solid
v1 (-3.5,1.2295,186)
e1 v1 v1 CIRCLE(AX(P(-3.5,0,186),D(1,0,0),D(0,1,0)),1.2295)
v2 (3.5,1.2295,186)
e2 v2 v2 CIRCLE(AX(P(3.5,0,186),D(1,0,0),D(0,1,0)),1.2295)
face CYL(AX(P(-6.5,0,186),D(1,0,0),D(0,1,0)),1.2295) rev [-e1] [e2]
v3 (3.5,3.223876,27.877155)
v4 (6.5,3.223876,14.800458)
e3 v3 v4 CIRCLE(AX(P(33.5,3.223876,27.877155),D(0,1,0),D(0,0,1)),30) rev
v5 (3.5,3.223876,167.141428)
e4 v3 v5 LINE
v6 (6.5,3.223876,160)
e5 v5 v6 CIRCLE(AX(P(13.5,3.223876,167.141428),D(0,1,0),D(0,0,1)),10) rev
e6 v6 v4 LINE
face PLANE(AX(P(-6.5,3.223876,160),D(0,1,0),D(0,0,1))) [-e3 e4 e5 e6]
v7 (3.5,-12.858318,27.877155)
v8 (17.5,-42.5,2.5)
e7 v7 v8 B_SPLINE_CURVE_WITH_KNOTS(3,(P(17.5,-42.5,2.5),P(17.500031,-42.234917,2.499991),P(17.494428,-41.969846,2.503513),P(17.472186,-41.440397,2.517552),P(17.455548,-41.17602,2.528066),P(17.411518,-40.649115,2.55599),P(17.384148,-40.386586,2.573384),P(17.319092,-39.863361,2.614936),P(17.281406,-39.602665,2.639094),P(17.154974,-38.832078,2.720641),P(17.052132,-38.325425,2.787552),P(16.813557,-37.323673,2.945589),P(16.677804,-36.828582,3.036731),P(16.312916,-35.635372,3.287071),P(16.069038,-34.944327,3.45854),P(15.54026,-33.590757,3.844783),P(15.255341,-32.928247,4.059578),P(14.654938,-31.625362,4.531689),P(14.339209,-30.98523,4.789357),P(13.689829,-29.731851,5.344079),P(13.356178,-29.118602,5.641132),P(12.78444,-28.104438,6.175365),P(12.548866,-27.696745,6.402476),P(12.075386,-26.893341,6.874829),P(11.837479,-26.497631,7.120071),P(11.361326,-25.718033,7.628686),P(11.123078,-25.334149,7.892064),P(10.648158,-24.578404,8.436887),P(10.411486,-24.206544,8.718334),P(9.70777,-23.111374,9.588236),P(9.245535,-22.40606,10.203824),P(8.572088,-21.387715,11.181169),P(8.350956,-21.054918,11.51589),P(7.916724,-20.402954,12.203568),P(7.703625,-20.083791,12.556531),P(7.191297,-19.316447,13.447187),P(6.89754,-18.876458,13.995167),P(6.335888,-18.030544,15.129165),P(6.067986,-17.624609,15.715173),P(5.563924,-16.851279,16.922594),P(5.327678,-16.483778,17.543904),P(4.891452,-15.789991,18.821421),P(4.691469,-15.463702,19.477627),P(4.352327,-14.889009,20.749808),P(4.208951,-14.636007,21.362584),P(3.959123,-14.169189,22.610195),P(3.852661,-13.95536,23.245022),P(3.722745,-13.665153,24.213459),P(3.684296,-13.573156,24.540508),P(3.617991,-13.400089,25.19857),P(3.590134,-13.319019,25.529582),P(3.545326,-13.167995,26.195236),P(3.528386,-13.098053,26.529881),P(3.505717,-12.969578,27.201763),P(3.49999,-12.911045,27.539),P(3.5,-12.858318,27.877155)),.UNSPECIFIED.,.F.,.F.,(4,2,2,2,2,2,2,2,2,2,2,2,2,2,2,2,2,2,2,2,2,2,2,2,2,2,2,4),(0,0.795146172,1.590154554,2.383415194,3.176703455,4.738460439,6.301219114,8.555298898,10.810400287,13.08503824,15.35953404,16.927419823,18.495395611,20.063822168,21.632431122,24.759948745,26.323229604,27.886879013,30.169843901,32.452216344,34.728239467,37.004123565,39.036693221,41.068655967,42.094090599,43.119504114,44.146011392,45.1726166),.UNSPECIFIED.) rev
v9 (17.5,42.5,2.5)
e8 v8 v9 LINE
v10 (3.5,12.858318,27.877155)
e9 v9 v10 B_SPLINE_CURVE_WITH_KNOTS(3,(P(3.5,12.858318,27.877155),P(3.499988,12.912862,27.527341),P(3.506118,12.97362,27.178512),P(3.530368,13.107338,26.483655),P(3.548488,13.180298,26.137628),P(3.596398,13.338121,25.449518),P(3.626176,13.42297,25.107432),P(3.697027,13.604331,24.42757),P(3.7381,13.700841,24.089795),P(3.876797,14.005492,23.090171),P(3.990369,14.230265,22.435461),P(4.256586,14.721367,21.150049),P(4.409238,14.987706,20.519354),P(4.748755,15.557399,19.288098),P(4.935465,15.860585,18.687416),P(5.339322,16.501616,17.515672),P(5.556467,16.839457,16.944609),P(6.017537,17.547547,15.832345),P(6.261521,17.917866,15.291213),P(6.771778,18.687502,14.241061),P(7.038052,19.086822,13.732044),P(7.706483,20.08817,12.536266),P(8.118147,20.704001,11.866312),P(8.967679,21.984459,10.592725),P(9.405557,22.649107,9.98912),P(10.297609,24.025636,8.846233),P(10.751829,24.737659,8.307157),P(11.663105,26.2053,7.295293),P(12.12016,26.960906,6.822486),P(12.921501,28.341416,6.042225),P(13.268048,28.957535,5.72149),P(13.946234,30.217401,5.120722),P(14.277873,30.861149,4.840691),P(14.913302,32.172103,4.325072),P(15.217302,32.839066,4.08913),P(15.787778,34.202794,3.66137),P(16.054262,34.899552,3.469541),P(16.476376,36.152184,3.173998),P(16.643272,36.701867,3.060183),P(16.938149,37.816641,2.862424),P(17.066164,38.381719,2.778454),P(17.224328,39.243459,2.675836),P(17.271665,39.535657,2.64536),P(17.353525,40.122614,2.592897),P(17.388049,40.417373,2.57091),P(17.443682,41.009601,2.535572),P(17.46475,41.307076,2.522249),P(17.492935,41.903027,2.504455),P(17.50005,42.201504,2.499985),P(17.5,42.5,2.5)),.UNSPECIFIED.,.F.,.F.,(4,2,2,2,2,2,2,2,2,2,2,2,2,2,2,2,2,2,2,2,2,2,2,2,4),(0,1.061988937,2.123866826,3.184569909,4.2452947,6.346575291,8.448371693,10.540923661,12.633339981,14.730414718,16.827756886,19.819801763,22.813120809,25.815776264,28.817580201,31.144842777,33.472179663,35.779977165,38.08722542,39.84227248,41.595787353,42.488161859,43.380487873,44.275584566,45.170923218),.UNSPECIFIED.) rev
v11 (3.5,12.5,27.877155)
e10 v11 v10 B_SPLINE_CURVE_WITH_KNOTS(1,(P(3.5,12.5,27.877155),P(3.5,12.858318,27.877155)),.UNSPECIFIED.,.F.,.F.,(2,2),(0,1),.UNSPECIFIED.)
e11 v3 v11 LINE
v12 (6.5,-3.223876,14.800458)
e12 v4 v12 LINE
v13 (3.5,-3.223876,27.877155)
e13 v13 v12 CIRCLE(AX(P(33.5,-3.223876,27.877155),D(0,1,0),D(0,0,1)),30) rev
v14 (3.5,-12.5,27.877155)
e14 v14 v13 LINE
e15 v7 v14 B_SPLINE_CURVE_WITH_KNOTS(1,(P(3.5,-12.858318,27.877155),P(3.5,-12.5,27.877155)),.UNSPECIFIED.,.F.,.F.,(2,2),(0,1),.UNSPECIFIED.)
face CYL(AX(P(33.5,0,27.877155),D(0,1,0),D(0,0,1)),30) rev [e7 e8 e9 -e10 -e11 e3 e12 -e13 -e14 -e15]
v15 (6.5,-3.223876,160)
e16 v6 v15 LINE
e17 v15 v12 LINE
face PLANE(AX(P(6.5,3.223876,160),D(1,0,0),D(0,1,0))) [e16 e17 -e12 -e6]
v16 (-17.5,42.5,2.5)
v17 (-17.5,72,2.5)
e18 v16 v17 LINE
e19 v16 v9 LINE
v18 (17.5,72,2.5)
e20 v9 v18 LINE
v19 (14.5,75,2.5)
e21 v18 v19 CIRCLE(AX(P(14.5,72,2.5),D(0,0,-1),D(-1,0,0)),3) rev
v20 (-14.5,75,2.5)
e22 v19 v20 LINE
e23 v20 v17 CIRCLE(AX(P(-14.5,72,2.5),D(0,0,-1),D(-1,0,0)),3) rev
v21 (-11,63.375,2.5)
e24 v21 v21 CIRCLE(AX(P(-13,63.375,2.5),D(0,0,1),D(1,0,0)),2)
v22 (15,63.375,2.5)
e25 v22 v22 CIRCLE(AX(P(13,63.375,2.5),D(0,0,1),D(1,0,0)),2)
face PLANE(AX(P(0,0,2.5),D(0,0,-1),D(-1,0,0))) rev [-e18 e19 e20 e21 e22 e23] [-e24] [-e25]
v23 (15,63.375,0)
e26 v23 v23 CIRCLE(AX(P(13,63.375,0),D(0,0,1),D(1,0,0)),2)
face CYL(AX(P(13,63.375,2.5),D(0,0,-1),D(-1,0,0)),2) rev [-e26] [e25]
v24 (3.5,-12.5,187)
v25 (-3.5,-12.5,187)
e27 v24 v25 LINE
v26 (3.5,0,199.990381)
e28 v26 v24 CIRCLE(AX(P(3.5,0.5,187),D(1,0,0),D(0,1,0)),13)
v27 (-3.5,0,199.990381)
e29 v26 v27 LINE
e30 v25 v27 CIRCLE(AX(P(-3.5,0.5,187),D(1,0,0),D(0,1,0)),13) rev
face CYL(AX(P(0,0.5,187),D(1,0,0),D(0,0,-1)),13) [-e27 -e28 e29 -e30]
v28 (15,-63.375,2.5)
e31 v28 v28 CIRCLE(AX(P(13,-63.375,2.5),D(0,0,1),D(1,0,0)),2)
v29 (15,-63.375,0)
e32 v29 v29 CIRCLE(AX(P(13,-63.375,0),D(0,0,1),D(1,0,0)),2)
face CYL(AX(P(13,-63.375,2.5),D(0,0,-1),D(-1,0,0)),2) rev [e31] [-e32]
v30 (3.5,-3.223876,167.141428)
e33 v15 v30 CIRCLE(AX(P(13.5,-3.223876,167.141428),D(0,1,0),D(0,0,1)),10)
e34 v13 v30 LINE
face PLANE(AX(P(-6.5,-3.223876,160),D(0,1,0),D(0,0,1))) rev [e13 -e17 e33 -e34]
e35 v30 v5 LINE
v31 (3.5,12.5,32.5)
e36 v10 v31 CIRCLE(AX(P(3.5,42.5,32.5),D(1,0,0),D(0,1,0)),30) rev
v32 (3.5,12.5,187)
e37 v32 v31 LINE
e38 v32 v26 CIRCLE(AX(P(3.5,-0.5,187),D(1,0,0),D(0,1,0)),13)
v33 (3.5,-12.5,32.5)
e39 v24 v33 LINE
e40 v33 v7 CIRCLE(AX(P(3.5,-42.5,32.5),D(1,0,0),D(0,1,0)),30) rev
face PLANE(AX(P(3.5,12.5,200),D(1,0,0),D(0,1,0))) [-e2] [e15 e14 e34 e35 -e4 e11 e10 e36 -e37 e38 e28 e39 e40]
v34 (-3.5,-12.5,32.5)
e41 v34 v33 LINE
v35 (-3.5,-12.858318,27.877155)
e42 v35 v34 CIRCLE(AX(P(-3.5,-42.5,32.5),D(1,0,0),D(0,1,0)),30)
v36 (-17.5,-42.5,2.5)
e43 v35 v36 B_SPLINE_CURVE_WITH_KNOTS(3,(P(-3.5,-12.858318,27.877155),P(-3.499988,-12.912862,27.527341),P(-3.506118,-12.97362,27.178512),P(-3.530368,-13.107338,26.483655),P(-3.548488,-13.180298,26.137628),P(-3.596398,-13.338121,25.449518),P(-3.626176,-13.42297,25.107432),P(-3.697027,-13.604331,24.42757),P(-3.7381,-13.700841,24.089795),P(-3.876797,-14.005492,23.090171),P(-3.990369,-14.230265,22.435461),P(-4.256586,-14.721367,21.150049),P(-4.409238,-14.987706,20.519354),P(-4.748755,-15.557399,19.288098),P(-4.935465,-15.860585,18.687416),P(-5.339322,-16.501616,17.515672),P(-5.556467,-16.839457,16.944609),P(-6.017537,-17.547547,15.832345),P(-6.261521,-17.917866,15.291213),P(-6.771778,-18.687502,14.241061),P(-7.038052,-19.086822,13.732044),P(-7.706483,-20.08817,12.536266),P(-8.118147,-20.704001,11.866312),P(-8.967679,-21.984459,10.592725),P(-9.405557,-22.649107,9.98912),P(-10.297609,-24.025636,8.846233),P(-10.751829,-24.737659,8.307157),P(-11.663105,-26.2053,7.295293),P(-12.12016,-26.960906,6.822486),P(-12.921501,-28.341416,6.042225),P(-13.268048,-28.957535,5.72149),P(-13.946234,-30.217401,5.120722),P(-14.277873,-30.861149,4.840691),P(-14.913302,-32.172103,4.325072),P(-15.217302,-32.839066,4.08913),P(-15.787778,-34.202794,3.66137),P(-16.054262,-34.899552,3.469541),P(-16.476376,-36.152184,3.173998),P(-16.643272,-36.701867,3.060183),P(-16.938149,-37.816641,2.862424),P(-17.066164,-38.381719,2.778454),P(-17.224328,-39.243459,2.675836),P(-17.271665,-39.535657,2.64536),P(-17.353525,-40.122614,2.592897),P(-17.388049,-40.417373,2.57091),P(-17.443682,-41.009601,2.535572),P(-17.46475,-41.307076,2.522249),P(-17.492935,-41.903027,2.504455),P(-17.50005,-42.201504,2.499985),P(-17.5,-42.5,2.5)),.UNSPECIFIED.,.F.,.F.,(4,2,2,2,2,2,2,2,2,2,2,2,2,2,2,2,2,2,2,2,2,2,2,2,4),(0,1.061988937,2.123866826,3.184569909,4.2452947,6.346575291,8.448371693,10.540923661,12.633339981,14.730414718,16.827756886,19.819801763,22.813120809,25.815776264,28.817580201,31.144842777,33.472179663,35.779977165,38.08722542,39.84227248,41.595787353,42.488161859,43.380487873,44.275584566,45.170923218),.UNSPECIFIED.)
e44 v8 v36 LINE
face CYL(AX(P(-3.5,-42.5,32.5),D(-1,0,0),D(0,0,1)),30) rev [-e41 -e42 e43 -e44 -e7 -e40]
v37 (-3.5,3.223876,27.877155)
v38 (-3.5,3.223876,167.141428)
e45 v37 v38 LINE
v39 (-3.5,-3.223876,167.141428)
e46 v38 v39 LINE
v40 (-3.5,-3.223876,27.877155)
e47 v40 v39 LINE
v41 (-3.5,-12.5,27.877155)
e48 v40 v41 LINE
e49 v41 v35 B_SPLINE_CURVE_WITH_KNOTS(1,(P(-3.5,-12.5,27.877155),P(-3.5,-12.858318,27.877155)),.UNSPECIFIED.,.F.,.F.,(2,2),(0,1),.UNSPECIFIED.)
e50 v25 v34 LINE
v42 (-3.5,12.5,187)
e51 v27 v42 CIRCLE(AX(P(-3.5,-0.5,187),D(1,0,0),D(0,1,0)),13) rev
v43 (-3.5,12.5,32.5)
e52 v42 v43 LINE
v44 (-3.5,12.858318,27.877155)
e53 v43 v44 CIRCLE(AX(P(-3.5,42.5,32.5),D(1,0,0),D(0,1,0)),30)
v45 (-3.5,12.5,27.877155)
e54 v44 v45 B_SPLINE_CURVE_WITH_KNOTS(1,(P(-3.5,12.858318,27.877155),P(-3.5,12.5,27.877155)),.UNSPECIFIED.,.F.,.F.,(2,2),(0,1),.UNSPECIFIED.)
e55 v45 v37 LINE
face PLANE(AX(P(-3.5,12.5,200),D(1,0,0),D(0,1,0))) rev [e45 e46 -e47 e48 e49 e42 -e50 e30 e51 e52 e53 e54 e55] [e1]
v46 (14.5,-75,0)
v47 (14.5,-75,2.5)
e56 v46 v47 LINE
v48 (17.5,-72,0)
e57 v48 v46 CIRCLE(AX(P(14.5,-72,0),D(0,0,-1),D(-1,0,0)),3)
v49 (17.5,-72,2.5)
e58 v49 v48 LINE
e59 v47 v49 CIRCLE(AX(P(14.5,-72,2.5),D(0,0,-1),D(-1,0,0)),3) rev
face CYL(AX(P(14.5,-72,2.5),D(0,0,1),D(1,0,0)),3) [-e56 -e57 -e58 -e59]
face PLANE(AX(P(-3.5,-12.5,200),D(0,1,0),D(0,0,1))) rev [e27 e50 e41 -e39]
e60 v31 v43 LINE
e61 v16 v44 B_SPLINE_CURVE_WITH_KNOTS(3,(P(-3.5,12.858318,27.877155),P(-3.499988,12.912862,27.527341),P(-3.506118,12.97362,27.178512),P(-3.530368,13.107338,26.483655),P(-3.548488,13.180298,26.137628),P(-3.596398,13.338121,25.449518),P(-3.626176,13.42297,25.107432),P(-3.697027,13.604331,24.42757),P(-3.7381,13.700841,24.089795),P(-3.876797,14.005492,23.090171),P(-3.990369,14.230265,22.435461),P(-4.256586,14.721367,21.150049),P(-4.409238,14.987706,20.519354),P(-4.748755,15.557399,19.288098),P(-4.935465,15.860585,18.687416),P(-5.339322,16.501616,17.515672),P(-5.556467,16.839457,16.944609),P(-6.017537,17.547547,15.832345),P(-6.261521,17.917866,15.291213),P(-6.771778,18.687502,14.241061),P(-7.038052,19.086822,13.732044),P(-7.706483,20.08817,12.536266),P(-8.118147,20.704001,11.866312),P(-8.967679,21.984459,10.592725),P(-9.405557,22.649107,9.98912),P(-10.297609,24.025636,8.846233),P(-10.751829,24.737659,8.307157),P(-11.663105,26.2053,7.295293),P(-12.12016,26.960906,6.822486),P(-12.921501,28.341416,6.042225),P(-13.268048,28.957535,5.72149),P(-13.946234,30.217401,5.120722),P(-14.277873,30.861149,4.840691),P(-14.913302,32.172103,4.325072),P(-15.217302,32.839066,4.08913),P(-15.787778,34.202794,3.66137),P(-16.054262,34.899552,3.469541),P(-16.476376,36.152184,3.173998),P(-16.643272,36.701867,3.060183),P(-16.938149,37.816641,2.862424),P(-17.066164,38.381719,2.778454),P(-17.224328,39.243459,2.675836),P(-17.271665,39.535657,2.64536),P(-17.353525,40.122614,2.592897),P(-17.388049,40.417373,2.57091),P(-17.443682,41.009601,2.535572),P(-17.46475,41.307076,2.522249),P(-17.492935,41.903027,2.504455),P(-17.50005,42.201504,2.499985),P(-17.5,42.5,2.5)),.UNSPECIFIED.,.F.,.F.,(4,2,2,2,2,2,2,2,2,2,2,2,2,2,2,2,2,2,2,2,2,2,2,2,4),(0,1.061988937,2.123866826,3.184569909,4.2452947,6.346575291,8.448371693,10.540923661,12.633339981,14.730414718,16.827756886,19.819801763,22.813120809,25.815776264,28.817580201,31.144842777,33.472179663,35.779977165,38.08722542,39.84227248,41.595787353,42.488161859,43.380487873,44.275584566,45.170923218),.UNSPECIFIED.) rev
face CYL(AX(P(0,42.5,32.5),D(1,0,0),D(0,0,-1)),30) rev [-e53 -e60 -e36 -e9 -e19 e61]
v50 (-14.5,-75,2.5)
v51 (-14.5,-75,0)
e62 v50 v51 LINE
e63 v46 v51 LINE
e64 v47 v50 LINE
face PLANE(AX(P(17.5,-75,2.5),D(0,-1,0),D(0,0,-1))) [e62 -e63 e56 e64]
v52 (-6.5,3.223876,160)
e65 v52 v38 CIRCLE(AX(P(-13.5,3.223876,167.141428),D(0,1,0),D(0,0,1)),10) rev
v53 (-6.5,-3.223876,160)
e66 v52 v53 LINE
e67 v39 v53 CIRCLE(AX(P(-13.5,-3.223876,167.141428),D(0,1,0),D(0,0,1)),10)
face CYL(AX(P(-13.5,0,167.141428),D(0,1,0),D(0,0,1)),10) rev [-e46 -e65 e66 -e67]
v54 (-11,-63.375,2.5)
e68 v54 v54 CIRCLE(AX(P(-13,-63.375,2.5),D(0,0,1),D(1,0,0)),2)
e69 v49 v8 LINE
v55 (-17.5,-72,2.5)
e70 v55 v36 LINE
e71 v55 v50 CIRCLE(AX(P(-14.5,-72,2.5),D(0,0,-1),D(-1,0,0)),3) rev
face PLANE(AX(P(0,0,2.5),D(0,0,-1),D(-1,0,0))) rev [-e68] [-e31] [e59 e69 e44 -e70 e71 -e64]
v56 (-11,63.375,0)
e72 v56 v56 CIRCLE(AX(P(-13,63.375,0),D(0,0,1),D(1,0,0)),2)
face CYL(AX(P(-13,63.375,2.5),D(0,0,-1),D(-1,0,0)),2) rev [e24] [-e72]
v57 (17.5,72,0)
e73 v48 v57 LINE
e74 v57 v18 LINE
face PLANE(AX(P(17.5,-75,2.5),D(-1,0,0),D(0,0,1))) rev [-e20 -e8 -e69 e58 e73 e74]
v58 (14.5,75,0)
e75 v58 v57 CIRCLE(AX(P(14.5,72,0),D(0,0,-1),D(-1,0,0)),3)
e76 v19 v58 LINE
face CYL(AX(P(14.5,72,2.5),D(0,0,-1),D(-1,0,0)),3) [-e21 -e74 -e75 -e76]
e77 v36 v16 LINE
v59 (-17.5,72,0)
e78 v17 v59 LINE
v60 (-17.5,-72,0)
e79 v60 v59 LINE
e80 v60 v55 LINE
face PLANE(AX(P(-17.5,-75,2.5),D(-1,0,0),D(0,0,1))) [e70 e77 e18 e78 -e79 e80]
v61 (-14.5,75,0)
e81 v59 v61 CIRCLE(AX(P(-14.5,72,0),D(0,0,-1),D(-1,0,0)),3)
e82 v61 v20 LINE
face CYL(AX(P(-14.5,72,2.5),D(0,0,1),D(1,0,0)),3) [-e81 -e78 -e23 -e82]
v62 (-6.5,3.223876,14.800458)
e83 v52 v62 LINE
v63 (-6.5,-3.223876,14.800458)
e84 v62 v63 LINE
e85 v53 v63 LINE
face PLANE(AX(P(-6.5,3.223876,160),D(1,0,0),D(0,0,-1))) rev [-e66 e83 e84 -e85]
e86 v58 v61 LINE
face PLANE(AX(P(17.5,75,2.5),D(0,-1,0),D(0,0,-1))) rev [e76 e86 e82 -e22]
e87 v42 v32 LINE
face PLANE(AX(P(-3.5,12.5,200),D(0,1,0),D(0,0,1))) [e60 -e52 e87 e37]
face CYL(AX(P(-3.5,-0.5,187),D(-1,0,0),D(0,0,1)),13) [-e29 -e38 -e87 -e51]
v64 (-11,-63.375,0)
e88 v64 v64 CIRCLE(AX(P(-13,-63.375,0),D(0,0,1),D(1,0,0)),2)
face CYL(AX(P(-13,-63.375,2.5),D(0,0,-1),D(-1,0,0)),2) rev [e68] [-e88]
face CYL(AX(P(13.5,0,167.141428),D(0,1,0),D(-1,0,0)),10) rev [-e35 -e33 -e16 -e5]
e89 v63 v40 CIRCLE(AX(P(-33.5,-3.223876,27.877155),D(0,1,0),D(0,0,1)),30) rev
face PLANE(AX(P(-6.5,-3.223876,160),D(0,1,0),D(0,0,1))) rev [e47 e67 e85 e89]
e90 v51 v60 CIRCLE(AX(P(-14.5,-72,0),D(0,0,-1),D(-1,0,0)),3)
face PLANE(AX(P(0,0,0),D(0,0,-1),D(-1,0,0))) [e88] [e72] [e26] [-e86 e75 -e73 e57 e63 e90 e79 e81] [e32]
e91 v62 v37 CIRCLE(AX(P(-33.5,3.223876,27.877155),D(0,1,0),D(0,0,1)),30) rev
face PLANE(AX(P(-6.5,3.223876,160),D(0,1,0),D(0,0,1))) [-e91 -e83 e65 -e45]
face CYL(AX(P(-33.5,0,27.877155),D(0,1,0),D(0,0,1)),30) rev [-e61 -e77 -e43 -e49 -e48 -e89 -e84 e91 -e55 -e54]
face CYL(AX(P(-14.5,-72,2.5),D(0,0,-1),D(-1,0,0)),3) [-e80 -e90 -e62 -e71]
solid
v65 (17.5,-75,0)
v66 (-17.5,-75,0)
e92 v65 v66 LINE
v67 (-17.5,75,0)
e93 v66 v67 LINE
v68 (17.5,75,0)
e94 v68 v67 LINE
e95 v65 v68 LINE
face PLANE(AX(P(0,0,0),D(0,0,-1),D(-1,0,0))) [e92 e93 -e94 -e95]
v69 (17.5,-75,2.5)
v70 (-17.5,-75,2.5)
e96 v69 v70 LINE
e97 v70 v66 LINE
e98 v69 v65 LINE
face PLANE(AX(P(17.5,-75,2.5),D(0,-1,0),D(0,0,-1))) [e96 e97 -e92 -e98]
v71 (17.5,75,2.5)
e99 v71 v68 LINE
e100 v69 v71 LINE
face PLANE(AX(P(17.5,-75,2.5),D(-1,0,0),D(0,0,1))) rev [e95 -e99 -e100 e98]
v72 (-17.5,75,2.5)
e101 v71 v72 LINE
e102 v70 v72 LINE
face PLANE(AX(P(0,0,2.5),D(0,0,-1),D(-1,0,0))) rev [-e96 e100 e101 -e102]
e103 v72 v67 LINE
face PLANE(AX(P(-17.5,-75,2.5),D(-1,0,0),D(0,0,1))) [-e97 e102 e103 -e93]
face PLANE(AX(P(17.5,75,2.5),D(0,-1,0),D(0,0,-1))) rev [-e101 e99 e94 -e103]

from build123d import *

# Parameters (mm, degrees)
ESQUISSE1_W             = 35
ESQUISSE1_H             = 150
BOSS_EXTRU_1_DEPTH      = 2.5
ESQUISSE1_5_W           = 35
ESQUISSE1_5_H           = 150
BOSS_EXTRU_2_DEPTH      = 2.5
ESQUISSE1_6_R           = 2
ENL_V_MAT_EXTRU_4_DEPTH = 2.5
ESQUISSE1_7_R           = 2
ENL_V_MAT_EXTRU_5_DEPTH = 2.5
ESQUISSE1_8_R           = 2
ENL_V_MAT_EXTRU_6_DEPTH = 2.5
ESQUISSE1_9_R           = 2
ENL_V_MAT_EXTRU_7_DEPTH = 2.5
CONG_2_R                = 3
ESQUISSE1_10_W          = 7
ESQUISSE1_10_H          = 25
BOSS_EXTRU_3_DEPTH      = 200
CONG_3_START            = -12.5
CONG_3_DEPTH            = 25
CONG_3_START_2          = -17.500000724
CONG_3_2_DEPTH          = 35.000000724
CONG_3_START_3          = -72
CONG_3_3_DEPTH          = 144
CONG_4_R                = 13
ESQUISSE11_R            = 1.2295
ENL_V_MAT_EXTRU_9_DEPTH = 10
ESQUISSE1_12_W          = 13
ESQUISSE1_12_H          = 6.447751058
BOSS_EXTRU_4_DEPTH      = 160
CONG_5_R                = 10
CONG_6_R                = 10


with BuildPart() as part:
    # Esquisse1 → Boss.-Extru.1 (new body)
    with BuildSketch(Plane.XY):
        Rectangle(ESQUISSE1_W, ESQUISSE1_H)
    extrude(amount=BOSS_EXTRU_1_DEPTH)


with BuildPart() as body_2:
    # Esquisse1<5> → Boss.-Extru.2 (new body)
    with BuildSketch(Plane.XY):
        Rectangle(ESQUISSE1_5_W, ESQUISSE1_5_H)
    extrude(amount=BOSS_EXTRU_2_DEPTH)

    # Esquisse1<6> → Enlèv. mat.-Extru.4 (cut)
    with BuildSketch(Plane.XY):
        with Locations((-13, 63.375)):
            Circle(ESQUISSE1_6_R)
    extrude(amount=ENL_V_MAT_EXTRU_4_DEPTH, mode=Mode.SUBTRACT)

    # Esquisse1<7> → Enlèv. mat.-Extru.5 (cut)
    with BuildSketch(Plane.XY):
        with Locations((13, 63.375)):
            Circle(ESQUISSE1_7_R)
    extrude(amount=ENL_V_MAT_EXTRU_5_DEPTH, mode=Mode.SUBTRACT)

    # Esquisse1<8> → Enlèv. mat.-Extru.6 (cut)
    with BuildSketch(Plane.XY):
        with Locations((-13, -63.375)):
            Circle(ESQUISSE1_8_R)
    extrude(amount=ENL_V_MAT_EXTRU_6_DEPTH, mode=Mode.SUBTRACT)

    # Esquisse1<9> → Enlèv. mat.-Extru.7 (cut)
    with BuildSketch(Plane.XY):
        with Locations((13, -63.375)):
            Circle(ESQUISSE1_9_R)
    extrude(amount=ENL_V_MAT_EXTRU_7_DEPTH, mode=Mode.SUBTRACT)

    # Congé2
    cong_2_edges = [body_2.edges().sort_by_distance(p)[0] for p in [
        (17.5, -75, 1.25),
        (17.5, 75, 1.25),
        (-17.5, 75, 1.25),
        (-17.5, -75, 1.25),
    ]]
    fillet(cong_2_edges, radius=CONG_2_R)

    # Esquisse1<10> → Boss.-Extru.3 (add)
    with BuildSketch(Plane.XY):
        Rectangle(ESQUISSE1_10_W, ESQUISSE1_10_H)
    extrude(amount=BOSS_EXTRU_3_DEPTH)

    # Congé3: read off the stored shape, not the designer's step
    # Congé3 outline → Congé3 (add)
    with BuildSketch(Plane(origin=(0, 0, 0), x_dir=(1, 0, 0), z_dir=(0, 1, 0)).offset(CONG_3_START)):
        with BuildLine():
            Line((17.500019353, -2.499987798), (3.5, -2.5))
            Line((3.5, -2.5), (3.5, -27.877155081))
            ThreePointArc((3.5, -27.877155081), (7.232154453, -13.385768319), (17.500019353, -2.499987798))
        make_face()
        with BuildLine():
            ThreePointArc((-17.500019353, -2.499987798), (-7.232154453, -13.385768319), (-3.5, -27.877155081))
            Line((-3.5, -27.877155081), (-3.5, -2.5))
            Line((-3.5, -2.5), (-17.500019353, -2.499987798))
        make_face()
    extrude(amount=CONG_3_DEPTH)

    # Cong_3 2 outline → Cong_3 2 (add)
    with BuildSketch(Plane.YZ.offset(CONG_3_START_2)):
        with BuildLine():
            Line((-42.5, 2.5), (-12.5, 2.5))
            Line((-12.5, 2.5), (-12.5, 32.5))
            ThreePointArc((-12.5, 32.5), (-21.286796564, 11.286796564), (-42.5, 2.5))
        make_face()
        with BuildLine():
            ThreePointArc((42.5, 2.5), (21.286796564, 11.286796564), (12.5, 32.5))
            Line((12.5, 32.5), (12.5, 2.5))
            Line((12.5, 2.5), (42.5, 2.5))
        make_face()
    extrude(amount=CONG_3_2_DEPTH)

    # Cong_3 3 outline → Cong_3 3 (cut)
    with BuildSketch(Plane(origin=(0, 0, 0), x_dir=(1, 0, 0), z_dir=(0, 1, 0)).offset(CONG_3_START_3)):
        with BuildLine():
            Line((-3.5, -34), (-3.5, -27.877155081))
            ThreePointArc((-3.5, -27.877155081), (-7.232154453, -13.385768319), (-17.500019353, -2.499987798))
            Line((-17.500019353, -2.499987798), (-19, -1.554269111))
            Line((-19, -1.554269111), (-19, -34))
            Line((-19, -34), (-3.5, -34))
        make_face()
        with BuildLine():
            Line((3.5, -27.877155081), (3.5, -34))
            Line((3.5, -34), (17.5, -34))
            Line((17.5, -34), (17.5, -32.5))
            Line((17.5, -32.5), (17.500019353, -2.499987798))
            ThreePointArc((17.500019353, -2.499987798), (7.232154453, -13.385768319), (3.5, -27.877155081))
        make_face()
    extrude(amount=CONG_3_3_DEPTH, mode=Mode.SUBTRACT)

    # Congé4
    # the kernel refuses this fillet: 13 mm, written as the material it takes off along each edge
    with BuildSketch(Plane(origin=(36, -12.5, 200), x_dir=(0, 0, -1), z_dir=(-1, 0, 0))) as cong_4_piece_1:
        with BuildLine():
            CenterArc((CONG_4_R, -CONG_4_R), CONG_4_R, 90, 90)
            Line((0, -CONG_4_R), (0, 0))
            Line((0, 0), (CONG_4_R, 0))
        make_face()
    extrude(amount=72, mode=Mode.SUBTRACT)
    with BuildSketch(Plane(origin=(-36, 12.5, 200), x_dir=(0, -1, 0), z_dir=(1, 0, 0))) as cong_4_piece_2:
        with BuildLine():
            CenterArc((CONG_4_R, CONG_4_R), CONG_4_R, 180, 90)
            Line((0, CONG_4_R), (0, 0))
            Line((0, 0), (CONG_4_R, 0))
        make_face()
    extrude(amount=72, mode=Mode.SUBTRACT)

    # Esquisse11 → Enlèv. mat.-Extru.9 (cut)
    with BuildSketch(Plane(origin=(3.5, 0, 0), x_dir=(0, 0, -1), z_dir=(1, 0, 0))):
        with Locations(Location((-186, 0, 0), (0, 0, 90))):
            Circle(ESQUISSE11_R)
    extrude(amount=-ENL_V_MAT_EXTRU_9_DEPTH, mode=Mode.SUBTRACT)

    # Esquisse1<12> → Boss.-Extru.4 (add)
    with BuildSketch(Plane.XY):
        Rectangle(ESQUISSE1_12_W, ESQUISSE1_12_H)
    extrude(amount=BOSS_EXTRU_4_DEPTH)

    # Congé5
    # the kernel refuses this fillet: 10 mm, written as the material it adds along each edge
    with BuildSketch(Plane(origin=(3.5, -3.223875529, 160), x_dir=(0, 0, 1), z_dir=(0, 1, 0))) as cong_5_piece_1:
        with BuildLine():
            CenterArc((7.141428429, 10), CONG_5_R, 224.427004001, 45.572995999)
            Line((0, 3), (-0.142828569, 2.86))
            ThreePointArc((-0.142828569, 2.86), (-0.2, 1.5), (-0.2, 0))
            Line((-0.2, 0), (0, -0.2))
            Line((0, -0.2), (7.141428429, -0.2))
            Line((7.141428429, -0.2), (7.141428429, 0))
        make_face()
    extrude(amount=6.447751059)

    # Congé6
    # the kernel refuses this fillet: 10 mm, written as the material it adds along each edge
    with BuildSketch(Plane(origin=(-3.5, 3.223875529, 160), x_dir=(-1, 0, 0), z_dir=(0, -1, 0))) as cong_6_piece_1:
        with BuildLine():
            CenterArc((10, -7.141428429), CONG_6_R, 134.427004001, 45.572995999)
            Line((0, -7.141428429), (-0.2, -7.141428429))
            Line((-0.2, -7.141428429), (-0.2, 0))
            Line((-0.2, 0), (0, 0.2))
            ThreePointArc((0, 0.2), (1.5, 0.2), (2.86, 0.142828569))
            Line((2.86, 0.142828569), (3, 0))
        make_face()
    extrude(amount=6.447751059)


solid = Compound([part.part, body_2.part])
